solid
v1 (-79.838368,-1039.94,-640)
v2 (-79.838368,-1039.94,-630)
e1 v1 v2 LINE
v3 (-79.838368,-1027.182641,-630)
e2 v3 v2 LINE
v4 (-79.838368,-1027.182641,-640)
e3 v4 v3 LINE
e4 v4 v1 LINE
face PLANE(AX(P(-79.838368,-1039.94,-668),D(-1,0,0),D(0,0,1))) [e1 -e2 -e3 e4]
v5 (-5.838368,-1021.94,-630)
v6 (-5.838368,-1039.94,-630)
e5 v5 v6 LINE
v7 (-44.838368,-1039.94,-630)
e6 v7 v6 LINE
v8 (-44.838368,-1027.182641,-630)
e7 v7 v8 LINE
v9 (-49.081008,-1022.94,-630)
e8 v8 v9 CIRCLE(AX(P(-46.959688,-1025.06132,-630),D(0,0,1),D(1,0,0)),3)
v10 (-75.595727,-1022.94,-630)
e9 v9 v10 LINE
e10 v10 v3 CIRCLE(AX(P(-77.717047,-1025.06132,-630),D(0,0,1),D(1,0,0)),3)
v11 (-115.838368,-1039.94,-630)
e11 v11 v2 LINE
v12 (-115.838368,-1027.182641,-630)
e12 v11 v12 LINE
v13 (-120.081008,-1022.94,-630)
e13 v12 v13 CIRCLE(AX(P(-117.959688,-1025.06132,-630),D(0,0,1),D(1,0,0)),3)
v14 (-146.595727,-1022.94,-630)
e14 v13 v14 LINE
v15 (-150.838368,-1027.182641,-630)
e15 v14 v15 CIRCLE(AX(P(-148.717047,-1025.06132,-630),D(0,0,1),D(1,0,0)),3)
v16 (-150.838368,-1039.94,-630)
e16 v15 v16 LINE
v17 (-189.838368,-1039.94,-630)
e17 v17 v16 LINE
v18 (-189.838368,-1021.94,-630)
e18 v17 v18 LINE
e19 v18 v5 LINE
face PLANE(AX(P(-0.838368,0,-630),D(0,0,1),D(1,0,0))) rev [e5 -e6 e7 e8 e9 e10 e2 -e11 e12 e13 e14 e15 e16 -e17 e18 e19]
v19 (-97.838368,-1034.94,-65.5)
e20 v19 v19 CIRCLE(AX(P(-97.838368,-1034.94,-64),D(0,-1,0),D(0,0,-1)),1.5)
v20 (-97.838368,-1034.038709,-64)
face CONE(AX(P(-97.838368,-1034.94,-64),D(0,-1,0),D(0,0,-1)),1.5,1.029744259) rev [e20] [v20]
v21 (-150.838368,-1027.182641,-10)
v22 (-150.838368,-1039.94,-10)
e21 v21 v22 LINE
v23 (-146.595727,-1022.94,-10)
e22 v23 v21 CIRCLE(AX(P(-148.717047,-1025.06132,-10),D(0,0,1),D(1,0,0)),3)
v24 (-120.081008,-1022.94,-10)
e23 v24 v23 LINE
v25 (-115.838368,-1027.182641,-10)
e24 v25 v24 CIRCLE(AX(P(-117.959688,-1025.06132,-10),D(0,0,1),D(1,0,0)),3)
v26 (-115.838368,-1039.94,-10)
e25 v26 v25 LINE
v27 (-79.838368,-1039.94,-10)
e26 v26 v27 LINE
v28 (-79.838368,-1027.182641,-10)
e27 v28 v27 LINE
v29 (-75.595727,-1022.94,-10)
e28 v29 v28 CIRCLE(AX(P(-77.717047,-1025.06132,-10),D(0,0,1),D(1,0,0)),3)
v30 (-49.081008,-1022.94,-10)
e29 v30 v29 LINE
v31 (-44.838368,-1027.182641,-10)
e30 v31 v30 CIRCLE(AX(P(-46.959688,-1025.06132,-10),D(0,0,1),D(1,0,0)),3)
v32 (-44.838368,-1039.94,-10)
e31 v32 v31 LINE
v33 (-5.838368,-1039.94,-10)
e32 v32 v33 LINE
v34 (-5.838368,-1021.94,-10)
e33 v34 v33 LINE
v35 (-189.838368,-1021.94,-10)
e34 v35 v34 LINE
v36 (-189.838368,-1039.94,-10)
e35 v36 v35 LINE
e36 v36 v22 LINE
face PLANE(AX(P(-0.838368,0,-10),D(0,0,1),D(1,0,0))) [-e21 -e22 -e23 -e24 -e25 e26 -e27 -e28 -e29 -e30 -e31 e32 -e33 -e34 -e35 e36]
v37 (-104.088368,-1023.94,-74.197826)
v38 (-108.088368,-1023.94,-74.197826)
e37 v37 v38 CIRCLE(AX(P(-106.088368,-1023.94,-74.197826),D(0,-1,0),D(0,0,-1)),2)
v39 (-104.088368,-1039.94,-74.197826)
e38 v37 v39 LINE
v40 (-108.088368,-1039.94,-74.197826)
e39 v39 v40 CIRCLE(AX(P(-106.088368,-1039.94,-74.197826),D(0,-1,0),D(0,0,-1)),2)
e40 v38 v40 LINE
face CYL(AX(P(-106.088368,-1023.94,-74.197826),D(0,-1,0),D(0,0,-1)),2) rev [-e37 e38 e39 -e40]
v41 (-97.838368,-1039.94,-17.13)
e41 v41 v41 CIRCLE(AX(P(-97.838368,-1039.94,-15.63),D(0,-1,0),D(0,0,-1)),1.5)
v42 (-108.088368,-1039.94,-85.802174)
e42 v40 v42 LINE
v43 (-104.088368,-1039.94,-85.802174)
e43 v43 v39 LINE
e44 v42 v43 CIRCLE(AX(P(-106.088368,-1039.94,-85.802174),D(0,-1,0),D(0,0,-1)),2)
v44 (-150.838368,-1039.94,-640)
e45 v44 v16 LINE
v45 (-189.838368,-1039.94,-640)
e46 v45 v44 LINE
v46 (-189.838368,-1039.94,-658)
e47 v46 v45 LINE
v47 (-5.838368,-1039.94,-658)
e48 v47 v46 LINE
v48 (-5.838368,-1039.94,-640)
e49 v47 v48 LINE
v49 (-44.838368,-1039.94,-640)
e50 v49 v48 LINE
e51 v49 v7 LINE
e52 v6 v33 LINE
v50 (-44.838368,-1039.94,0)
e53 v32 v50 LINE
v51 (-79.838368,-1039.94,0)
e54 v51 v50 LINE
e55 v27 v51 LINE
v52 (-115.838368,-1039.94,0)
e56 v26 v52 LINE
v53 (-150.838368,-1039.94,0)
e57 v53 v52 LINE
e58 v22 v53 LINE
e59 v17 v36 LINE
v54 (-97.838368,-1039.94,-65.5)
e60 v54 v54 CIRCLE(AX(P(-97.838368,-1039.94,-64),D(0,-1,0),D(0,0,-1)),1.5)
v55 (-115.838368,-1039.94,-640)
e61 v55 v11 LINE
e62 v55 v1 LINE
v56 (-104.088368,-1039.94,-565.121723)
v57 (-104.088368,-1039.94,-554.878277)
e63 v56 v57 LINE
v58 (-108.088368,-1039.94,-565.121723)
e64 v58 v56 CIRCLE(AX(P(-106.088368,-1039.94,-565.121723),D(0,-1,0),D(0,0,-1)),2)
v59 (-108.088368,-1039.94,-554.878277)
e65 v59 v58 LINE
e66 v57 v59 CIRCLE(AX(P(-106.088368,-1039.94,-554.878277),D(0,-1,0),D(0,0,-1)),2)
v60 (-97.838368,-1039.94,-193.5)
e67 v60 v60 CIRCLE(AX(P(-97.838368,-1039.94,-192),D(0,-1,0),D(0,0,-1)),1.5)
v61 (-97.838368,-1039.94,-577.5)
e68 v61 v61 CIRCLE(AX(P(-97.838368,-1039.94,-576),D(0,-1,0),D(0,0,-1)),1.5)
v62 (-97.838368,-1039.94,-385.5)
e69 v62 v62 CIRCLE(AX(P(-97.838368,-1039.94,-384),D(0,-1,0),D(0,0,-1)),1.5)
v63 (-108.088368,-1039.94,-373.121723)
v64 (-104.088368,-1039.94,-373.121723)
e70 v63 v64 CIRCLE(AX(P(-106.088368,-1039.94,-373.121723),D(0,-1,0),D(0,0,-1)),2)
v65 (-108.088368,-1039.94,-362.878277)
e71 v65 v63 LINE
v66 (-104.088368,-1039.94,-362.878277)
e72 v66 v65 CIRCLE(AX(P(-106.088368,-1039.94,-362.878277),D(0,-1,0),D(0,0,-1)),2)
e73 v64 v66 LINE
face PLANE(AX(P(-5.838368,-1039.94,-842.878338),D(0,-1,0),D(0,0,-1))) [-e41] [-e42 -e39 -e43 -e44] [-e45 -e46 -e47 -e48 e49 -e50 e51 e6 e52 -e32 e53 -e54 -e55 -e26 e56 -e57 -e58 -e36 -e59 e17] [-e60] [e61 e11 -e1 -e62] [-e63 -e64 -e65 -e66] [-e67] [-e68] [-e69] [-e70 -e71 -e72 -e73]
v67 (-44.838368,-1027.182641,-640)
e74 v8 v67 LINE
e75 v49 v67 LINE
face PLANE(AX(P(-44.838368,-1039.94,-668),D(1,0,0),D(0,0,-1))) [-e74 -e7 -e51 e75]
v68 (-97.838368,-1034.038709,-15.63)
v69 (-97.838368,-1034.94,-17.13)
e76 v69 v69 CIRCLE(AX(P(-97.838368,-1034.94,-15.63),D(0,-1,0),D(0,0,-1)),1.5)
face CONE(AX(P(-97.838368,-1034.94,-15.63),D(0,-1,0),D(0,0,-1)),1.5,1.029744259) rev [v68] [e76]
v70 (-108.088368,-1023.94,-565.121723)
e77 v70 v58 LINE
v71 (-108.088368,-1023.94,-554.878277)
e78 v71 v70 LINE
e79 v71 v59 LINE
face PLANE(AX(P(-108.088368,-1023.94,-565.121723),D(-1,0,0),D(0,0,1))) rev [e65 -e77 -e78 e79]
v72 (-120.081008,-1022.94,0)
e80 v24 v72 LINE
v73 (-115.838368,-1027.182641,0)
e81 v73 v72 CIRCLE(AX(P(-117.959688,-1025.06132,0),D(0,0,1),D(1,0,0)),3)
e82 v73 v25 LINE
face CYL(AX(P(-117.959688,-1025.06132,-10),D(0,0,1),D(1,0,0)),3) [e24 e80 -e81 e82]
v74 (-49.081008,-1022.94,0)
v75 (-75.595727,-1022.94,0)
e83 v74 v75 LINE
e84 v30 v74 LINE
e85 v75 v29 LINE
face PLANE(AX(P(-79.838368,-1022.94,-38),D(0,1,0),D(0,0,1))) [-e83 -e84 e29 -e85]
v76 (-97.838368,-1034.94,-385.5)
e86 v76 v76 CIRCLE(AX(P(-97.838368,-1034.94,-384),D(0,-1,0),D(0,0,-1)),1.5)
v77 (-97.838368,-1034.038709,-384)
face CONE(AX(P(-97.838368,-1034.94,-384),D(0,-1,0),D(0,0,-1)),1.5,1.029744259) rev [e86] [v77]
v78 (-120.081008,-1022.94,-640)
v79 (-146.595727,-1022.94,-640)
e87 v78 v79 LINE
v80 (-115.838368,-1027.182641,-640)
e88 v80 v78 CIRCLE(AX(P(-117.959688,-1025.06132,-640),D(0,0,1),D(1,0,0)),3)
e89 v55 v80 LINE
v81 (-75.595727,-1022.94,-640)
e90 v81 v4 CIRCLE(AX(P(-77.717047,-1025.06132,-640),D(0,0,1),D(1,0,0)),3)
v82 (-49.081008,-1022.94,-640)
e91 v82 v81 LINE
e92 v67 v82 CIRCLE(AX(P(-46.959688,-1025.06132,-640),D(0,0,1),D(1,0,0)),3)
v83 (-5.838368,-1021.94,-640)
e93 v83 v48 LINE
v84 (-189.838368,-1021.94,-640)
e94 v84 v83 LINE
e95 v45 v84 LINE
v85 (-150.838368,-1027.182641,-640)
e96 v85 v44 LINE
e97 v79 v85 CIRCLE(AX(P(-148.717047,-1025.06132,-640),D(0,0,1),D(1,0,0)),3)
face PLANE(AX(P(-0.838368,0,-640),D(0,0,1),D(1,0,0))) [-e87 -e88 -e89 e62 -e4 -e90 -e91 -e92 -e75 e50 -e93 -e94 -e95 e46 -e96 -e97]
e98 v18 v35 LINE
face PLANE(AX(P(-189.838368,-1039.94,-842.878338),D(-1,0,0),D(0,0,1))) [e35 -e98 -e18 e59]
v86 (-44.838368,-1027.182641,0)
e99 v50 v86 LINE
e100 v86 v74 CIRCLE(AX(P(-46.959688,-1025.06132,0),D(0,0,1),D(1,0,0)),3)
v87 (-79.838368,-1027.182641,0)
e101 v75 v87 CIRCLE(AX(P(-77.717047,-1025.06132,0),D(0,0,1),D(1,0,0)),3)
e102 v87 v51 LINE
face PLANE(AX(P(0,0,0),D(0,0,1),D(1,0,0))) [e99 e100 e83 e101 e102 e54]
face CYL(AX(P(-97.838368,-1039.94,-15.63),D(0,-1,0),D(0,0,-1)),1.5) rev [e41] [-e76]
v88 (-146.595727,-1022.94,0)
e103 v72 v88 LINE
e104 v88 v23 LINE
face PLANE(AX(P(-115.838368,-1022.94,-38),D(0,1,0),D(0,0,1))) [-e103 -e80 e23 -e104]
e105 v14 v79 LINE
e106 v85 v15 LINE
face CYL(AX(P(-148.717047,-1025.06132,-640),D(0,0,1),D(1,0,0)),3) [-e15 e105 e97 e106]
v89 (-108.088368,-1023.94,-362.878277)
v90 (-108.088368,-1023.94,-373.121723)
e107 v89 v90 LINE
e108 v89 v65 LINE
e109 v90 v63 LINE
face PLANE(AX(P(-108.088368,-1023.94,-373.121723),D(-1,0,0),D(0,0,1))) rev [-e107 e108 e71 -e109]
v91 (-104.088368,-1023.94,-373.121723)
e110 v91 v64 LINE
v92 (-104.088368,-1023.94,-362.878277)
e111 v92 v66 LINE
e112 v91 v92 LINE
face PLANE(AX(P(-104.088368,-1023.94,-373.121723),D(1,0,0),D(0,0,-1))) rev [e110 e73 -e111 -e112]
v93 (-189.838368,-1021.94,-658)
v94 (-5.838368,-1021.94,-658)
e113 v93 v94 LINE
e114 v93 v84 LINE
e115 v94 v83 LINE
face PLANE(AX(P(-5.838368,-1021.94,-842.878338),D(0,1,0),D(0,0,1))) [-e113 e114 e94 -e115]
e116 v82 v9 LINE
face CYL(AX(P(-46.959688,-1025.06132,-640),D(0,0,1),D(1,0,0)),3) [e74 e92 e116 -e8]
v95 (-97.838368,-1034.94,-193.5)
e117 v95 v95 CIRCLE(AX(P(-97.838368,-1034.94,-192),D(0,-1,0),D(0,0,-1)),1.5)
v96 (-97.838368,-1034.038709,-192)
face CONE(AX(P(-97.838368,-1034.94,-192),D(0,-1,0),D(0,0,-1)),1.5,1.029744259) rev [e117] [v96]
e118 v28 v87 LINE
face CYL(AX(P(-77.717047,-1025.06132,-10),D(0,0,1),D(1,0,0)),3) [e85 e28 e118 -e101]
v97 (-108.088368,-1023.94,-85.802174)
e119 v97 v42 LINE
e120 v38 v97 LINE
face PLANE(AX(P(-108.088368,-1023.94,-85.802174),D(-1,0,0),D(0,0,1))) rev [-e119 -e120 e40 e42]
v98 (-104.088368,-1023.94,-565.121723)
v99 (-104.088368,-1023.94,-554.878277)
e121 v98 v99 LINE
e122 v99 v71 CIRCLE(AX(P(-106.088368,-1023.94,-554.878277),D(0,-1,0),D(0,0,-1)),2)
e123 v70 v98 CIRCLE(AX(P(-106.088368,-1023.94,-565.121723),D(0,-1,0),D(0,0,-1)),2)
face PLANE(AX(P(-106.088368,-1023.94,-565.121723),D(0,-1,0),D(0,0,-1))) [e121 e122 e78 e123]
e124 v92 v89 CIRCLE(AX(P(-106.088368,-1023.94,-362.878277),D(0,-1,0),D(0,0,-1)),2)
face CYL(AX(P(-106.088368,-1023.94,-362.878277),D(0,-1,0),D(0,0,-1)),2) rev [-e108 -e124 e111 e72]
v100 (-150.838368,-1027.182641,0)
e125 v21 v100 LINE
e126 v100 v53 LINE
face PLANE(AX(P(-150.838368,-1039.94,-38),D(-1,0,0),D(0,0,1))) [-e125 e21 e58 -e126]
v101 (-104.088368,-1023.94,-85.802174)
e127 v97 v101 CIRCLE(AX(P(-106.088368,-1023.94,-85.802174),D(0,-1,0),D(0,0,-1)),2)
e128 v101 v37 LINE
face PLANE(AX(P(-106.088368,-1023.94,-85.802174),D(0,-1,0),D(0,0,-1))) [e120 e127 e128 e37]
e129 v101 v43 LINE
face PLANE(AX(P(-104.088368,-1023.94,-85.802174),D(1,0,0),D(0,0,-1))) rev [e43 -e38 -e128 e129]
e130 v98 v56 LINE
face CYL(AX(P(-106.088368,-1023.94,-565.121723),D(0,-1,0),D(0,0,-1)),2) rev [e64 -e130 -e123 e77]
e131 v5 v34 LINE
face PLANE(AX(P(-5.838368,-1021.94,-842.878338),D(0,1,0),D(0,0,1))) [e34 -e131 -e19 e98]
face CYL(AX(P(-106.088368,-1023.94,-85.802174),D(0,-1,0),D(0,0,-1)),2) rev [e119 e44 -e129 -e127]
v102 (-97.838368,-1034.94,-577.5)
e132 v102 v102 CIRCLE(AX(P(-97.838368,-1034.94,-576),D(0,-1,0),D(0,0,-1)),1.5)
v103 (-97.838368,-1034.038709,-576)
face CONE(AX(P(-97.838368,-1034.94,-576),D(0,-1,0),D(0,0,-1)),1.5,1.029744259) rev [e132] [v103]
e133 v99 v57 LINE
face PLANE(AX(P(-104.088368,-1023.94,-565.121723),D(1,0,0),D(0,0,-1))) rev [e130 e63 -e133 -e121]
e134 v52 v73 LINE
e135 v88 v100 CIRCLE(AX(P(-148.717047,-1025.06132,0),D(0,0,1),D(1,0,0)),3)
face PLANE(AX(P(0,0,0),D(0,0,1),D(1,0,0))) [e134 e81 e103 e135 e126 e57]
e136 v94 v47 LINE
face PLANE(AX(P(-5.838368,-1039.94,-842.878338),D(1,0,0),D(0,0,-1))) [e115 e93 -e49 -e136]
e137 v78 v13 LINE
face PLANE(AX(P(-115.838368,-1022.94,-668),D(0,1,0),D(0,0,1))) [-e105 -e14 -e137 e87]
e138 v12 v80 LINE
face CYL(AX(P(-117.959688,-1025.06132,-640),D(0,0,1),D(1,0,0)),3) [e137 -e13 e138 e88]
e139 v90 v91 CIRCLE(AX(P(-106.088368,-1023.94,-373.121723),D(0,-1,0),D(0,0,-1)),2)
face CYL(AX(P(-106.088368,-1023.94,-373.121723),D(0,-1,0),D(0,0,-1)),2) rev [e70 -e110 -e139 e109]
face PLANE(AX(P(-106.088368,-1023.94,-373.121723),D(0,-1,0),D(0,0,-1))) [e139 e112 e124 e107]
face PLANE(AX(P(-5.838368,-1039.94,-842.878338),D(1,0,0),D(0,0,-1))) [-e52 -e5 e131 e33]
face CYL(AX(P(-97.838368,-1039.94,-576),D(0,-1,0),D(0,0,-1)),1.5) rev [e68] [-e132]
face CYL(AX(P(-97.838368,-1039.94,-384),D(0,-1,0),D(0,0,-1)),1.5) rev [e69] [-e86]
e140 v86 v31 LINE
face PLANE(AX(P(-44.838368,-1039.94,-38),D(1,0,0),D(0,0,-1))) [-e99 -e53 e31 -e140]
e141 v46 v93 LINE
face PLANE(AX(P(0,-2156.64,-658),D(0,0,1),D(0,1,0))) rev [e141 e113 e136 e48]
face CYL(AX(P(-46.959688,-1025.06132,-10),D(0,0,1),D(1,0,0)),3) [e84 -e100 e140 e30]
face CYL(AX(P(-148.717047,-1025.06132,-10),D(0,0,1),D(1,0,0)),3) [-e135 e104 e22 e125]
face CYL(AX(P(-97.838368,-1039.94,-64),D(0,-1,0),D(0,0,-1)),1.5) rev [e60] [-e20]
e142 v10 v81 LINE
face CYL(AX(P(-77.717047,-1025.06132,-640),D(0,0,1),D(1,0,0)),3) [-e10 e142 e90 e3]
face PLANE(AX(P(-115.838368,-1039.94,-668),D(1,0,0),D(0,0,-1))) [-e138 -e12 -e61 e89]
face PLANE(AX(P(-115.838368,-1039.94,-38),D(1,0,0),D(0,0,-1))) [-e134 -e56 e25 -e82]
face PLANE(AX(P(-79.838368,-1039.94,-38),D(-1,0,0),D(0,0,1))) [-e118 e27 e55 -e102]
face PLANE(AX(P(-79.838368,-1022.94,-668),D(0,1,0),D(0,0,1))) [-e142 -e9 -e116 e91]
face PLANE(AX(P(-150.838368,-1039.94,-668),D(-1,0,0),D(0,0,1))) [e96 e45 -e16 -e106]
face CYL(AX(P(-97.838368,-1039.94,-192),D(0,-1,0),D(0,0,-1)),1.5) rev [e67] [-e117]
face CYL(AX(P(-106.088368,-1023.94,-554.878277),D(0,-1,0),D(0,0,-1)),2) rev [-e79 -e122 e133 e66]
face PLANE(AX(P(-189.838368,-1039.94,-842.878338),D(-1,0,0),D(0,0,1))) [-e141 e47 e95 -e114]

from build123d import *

# Parameters (mm, degrees)
SKETCH1_W                    = 184
SKETCH1_H                    = 18
BOSS_EXTRUDE1_DEPTH          = 658
F_3_0_3_DIAMETER_HOLE2_D     = 3
F_3_0_3_DIAMETER_HOLE2_DEPTH = 5
F_3_0_3_DIAMETER_HOLE2_TIP   = 0.901290929
CUT_EXTRUDE3_DEPTH           = 16
CAVITY1_START                = -640
CAVITY1_DEPTH                = 10
CAVITY1_START_2              = -10
CAVITY1_2_DEPTH              = 10


# Read off the part's stored shape, not the designer's step: Cavity1
with BuildPart() as part:
    # Sketch1 → Boss-Extrude1 (new body)
    with BuildSketch(Plane.XY):
        with Locations((-97.838367622, -1030.94)):
            Rectangle(SKETCH1_W, SKETCH1_H)
    extrude(amount=-BOSS_EXTRUDE1_DEPTH)

    # Ø3.0 (3) Diameter Hole2
    with Locations(Plane(origin=(0, -1039.94, 0), x_dir=(-1, 0, 0), z_dir=(0, -1, 0))):
        with Locations((97.838367622, 64), (97.838367622, 384), (97.838367622, 576), (97.838367622, 192), (97.838367622, 15.63)):
            Hole(F_3_0_3_DIAMETER_HOLE2_D / 2, depth=F_3_0_3_DIAMETER_HOLE2_DEPTH)
            with Locations((0, 0, -(F_3_0_3_DIAMETER_HOLE2_DEPTH + F_3_0_3_DIAMETER_HOLE2_TIP / 2))):  # 118° drill point
                Cone(0, F_3_0_3_DIAMETER_HOLE2_D / 2, F_3_0_3_DIAMETER_HOLE2_TIP, mode=Mode.SUBTRACT)

    # Sketch8 → Cut-Extrude3 (cut)
    with BuildSketch(Plane.XZ.offset(1039.94)):
        with BuildLine():
            Line((-108.088367622, -85.802173793), (-108.088367622, -74.197826207))
            ThreePointArc((-108.088367622, -74.197826207), (-106.088367622, -72.197826207), (-104.088367622, -74.197826207))
            Line((-104.088367622, -74.197826207), (-104.088367622, -85.802173793))
            ThreePointArc((-104.088367622, -85.802173793), (-106.088367622, -87.802173793), (-108.088367622, -85.802173793))
        make_face()
        with BuildLine():
            Line((-108.088367622, -373.121722836), (-108.088367622, -362.878277164))
            ThreePointArc((-108.088367622, -362.878277164), (-106.088367622, -360.878277164), (-104.088367622, -362.878277164))
            Line((-104.088367622, -362.878277164), (-104.088367622, -373.121722836))
            ThreePointArc((-104.088367622, -373.121722836), (-106.088367622, -375.121722836), (-108.088367622, -373.121722836))
        make_face()
        with BuildLine():
            Line((-108.088367622, -565.121722836), (-108.088367622, -554.878277164))
            ThreePointArc((-108.088367622, -554.878277164), (-106.088367622, -552.878277164), (-104.088367622, -554.878277164))
            Line((-104.088367622, -554.878277164), (-104.088367622, -565.121722836))
            ThreePointArc((-104.088367622, -565.121722836), (-106.088367622, -567.121722836), (-108.088367622, -565.121722836))
        make_face()
    extrude(amount=-CUT_EXTRUDE3_DEPTH, mode=Mode.SUBTRACT)

    # Cavity1 outline → Cavity1 (cut)
    with BuildSketch(Plane.XY.offset(CAVITY1_START)):
        with BuildLine():
            Line((-150.838367622, -1039.94), (-150.838367622, -1027.182640687))
            ThreePointArc((-150.838367622, -1027.182640687), (-150.838367621, -1022.94), (-146.595726934, -1022.94))
            Line((-146.595726934, -1022.94), (-120.081008309, -1022.94))
            ThreePointArc((-120.081008309, -1022.94), (-115.838367622, -1022.94), (-115.838367622, -1027.182640687))
            Line((-115.838367622, -1027.182640687), (-115.838367622, -1039.94))
            Line((-115.838367622, -1039.94), (-79.838367622, -1039.94))
            Line((-79.838367622, -1039.94), (-79.838367622, -1027.182640687))
            ThreePointArc((-79.838367622, -1027.182640687), (-79.838367621, -1022.94), (-75.595726934, -1022.94))
            Line((-75.595726934, -1022.94), (-49.081008309, -1022.94))
            ThreePointArc((-49.081008309, -1022.94), (-44.838367622, -1022.94), (-44.838367622, -1027.182640687))
            Line((-44.838367622, -1027.182640687), (-44.838367622, -1039.94))
            Line((-44.838367622, -1039.94), (-5.838367622, -1039.94))
            Line((-5.838367622, -1039.94), (-5.838367622, -1021.94))
            Line((-5.838367622, -1021.94), (-189.838367622, -1021.94))
            Line((-189.838367622, -1021.94), (-189.838367622, -1039.94))
            Line((-189.838367622, -1039.94), (-150.838367622, -1039.94))
        make_face()
    extrude(amount=CAVITY1_DEPTH, mode=Mode.SUBTRACT)

    # Cavity1 2 outline → Cavity1 2 (cut)
    with BuildSketch(Plane.XY.offset(CAVITY1_START_2)):
        with BuildLine():
            Line((-150.838367622, -1039.94), (-150.838367622, -1027.182640687))
            ThreePointArc((-150.838367622, -1027.182640687), (-150.838367621, -1022.94), (-146.595726934, -1022.94))
            Line((-146.595726934, -1022.94), (-120.081008309, -1022.94))
            ThreePointArc((-120.081008309, -1022.94), (-115.838367622, -1022.94), (-115.838367622, -1027.182640687))
            Line((-115.838367622, -1027.182640687), (-115.838367622, -1039.94))
            Line((-115.838367622, -1039.94), (-79.838367622, -1039.94))
            Line((-79.838367622, -1039.94), (-79.838367622, -1027.182640687))
            ThreePointArc((-79.838367622, -1027.182640687), (-79.838367621, -1022.94), (-75.595726934, -1022.94))
            Line((-75.595726934, -1022.94), (-49.081008309, -1022.94))
            ThreePointArc((-49.081008309, -1022.94), (-44.838367622, -1022.94), (-44.838367622, -1027.182640687))
            Line((-44.838367622, -1027.182640687), (-44.838367622, -1039.94))
            Line((-44.838367622, -1039.94), (-5.838367622, -1039.94))
            Line((-5.838367622, -1039.94), (-5.838367622, -1021.94))
            Line((-5.838367622, -1021.94), (-189.838367622, -1021.94))
            Line((-189.838367622, -1021.94), (-189.838367622, -1039.94))
            Line((-189.838367622, -1039.94), (-150.838367622, -1039.94))
        make_face()
    extrude(amount=CAVITY1_2_DEPTH, mode=Mode.SUBTRACT)


solid = part.part
